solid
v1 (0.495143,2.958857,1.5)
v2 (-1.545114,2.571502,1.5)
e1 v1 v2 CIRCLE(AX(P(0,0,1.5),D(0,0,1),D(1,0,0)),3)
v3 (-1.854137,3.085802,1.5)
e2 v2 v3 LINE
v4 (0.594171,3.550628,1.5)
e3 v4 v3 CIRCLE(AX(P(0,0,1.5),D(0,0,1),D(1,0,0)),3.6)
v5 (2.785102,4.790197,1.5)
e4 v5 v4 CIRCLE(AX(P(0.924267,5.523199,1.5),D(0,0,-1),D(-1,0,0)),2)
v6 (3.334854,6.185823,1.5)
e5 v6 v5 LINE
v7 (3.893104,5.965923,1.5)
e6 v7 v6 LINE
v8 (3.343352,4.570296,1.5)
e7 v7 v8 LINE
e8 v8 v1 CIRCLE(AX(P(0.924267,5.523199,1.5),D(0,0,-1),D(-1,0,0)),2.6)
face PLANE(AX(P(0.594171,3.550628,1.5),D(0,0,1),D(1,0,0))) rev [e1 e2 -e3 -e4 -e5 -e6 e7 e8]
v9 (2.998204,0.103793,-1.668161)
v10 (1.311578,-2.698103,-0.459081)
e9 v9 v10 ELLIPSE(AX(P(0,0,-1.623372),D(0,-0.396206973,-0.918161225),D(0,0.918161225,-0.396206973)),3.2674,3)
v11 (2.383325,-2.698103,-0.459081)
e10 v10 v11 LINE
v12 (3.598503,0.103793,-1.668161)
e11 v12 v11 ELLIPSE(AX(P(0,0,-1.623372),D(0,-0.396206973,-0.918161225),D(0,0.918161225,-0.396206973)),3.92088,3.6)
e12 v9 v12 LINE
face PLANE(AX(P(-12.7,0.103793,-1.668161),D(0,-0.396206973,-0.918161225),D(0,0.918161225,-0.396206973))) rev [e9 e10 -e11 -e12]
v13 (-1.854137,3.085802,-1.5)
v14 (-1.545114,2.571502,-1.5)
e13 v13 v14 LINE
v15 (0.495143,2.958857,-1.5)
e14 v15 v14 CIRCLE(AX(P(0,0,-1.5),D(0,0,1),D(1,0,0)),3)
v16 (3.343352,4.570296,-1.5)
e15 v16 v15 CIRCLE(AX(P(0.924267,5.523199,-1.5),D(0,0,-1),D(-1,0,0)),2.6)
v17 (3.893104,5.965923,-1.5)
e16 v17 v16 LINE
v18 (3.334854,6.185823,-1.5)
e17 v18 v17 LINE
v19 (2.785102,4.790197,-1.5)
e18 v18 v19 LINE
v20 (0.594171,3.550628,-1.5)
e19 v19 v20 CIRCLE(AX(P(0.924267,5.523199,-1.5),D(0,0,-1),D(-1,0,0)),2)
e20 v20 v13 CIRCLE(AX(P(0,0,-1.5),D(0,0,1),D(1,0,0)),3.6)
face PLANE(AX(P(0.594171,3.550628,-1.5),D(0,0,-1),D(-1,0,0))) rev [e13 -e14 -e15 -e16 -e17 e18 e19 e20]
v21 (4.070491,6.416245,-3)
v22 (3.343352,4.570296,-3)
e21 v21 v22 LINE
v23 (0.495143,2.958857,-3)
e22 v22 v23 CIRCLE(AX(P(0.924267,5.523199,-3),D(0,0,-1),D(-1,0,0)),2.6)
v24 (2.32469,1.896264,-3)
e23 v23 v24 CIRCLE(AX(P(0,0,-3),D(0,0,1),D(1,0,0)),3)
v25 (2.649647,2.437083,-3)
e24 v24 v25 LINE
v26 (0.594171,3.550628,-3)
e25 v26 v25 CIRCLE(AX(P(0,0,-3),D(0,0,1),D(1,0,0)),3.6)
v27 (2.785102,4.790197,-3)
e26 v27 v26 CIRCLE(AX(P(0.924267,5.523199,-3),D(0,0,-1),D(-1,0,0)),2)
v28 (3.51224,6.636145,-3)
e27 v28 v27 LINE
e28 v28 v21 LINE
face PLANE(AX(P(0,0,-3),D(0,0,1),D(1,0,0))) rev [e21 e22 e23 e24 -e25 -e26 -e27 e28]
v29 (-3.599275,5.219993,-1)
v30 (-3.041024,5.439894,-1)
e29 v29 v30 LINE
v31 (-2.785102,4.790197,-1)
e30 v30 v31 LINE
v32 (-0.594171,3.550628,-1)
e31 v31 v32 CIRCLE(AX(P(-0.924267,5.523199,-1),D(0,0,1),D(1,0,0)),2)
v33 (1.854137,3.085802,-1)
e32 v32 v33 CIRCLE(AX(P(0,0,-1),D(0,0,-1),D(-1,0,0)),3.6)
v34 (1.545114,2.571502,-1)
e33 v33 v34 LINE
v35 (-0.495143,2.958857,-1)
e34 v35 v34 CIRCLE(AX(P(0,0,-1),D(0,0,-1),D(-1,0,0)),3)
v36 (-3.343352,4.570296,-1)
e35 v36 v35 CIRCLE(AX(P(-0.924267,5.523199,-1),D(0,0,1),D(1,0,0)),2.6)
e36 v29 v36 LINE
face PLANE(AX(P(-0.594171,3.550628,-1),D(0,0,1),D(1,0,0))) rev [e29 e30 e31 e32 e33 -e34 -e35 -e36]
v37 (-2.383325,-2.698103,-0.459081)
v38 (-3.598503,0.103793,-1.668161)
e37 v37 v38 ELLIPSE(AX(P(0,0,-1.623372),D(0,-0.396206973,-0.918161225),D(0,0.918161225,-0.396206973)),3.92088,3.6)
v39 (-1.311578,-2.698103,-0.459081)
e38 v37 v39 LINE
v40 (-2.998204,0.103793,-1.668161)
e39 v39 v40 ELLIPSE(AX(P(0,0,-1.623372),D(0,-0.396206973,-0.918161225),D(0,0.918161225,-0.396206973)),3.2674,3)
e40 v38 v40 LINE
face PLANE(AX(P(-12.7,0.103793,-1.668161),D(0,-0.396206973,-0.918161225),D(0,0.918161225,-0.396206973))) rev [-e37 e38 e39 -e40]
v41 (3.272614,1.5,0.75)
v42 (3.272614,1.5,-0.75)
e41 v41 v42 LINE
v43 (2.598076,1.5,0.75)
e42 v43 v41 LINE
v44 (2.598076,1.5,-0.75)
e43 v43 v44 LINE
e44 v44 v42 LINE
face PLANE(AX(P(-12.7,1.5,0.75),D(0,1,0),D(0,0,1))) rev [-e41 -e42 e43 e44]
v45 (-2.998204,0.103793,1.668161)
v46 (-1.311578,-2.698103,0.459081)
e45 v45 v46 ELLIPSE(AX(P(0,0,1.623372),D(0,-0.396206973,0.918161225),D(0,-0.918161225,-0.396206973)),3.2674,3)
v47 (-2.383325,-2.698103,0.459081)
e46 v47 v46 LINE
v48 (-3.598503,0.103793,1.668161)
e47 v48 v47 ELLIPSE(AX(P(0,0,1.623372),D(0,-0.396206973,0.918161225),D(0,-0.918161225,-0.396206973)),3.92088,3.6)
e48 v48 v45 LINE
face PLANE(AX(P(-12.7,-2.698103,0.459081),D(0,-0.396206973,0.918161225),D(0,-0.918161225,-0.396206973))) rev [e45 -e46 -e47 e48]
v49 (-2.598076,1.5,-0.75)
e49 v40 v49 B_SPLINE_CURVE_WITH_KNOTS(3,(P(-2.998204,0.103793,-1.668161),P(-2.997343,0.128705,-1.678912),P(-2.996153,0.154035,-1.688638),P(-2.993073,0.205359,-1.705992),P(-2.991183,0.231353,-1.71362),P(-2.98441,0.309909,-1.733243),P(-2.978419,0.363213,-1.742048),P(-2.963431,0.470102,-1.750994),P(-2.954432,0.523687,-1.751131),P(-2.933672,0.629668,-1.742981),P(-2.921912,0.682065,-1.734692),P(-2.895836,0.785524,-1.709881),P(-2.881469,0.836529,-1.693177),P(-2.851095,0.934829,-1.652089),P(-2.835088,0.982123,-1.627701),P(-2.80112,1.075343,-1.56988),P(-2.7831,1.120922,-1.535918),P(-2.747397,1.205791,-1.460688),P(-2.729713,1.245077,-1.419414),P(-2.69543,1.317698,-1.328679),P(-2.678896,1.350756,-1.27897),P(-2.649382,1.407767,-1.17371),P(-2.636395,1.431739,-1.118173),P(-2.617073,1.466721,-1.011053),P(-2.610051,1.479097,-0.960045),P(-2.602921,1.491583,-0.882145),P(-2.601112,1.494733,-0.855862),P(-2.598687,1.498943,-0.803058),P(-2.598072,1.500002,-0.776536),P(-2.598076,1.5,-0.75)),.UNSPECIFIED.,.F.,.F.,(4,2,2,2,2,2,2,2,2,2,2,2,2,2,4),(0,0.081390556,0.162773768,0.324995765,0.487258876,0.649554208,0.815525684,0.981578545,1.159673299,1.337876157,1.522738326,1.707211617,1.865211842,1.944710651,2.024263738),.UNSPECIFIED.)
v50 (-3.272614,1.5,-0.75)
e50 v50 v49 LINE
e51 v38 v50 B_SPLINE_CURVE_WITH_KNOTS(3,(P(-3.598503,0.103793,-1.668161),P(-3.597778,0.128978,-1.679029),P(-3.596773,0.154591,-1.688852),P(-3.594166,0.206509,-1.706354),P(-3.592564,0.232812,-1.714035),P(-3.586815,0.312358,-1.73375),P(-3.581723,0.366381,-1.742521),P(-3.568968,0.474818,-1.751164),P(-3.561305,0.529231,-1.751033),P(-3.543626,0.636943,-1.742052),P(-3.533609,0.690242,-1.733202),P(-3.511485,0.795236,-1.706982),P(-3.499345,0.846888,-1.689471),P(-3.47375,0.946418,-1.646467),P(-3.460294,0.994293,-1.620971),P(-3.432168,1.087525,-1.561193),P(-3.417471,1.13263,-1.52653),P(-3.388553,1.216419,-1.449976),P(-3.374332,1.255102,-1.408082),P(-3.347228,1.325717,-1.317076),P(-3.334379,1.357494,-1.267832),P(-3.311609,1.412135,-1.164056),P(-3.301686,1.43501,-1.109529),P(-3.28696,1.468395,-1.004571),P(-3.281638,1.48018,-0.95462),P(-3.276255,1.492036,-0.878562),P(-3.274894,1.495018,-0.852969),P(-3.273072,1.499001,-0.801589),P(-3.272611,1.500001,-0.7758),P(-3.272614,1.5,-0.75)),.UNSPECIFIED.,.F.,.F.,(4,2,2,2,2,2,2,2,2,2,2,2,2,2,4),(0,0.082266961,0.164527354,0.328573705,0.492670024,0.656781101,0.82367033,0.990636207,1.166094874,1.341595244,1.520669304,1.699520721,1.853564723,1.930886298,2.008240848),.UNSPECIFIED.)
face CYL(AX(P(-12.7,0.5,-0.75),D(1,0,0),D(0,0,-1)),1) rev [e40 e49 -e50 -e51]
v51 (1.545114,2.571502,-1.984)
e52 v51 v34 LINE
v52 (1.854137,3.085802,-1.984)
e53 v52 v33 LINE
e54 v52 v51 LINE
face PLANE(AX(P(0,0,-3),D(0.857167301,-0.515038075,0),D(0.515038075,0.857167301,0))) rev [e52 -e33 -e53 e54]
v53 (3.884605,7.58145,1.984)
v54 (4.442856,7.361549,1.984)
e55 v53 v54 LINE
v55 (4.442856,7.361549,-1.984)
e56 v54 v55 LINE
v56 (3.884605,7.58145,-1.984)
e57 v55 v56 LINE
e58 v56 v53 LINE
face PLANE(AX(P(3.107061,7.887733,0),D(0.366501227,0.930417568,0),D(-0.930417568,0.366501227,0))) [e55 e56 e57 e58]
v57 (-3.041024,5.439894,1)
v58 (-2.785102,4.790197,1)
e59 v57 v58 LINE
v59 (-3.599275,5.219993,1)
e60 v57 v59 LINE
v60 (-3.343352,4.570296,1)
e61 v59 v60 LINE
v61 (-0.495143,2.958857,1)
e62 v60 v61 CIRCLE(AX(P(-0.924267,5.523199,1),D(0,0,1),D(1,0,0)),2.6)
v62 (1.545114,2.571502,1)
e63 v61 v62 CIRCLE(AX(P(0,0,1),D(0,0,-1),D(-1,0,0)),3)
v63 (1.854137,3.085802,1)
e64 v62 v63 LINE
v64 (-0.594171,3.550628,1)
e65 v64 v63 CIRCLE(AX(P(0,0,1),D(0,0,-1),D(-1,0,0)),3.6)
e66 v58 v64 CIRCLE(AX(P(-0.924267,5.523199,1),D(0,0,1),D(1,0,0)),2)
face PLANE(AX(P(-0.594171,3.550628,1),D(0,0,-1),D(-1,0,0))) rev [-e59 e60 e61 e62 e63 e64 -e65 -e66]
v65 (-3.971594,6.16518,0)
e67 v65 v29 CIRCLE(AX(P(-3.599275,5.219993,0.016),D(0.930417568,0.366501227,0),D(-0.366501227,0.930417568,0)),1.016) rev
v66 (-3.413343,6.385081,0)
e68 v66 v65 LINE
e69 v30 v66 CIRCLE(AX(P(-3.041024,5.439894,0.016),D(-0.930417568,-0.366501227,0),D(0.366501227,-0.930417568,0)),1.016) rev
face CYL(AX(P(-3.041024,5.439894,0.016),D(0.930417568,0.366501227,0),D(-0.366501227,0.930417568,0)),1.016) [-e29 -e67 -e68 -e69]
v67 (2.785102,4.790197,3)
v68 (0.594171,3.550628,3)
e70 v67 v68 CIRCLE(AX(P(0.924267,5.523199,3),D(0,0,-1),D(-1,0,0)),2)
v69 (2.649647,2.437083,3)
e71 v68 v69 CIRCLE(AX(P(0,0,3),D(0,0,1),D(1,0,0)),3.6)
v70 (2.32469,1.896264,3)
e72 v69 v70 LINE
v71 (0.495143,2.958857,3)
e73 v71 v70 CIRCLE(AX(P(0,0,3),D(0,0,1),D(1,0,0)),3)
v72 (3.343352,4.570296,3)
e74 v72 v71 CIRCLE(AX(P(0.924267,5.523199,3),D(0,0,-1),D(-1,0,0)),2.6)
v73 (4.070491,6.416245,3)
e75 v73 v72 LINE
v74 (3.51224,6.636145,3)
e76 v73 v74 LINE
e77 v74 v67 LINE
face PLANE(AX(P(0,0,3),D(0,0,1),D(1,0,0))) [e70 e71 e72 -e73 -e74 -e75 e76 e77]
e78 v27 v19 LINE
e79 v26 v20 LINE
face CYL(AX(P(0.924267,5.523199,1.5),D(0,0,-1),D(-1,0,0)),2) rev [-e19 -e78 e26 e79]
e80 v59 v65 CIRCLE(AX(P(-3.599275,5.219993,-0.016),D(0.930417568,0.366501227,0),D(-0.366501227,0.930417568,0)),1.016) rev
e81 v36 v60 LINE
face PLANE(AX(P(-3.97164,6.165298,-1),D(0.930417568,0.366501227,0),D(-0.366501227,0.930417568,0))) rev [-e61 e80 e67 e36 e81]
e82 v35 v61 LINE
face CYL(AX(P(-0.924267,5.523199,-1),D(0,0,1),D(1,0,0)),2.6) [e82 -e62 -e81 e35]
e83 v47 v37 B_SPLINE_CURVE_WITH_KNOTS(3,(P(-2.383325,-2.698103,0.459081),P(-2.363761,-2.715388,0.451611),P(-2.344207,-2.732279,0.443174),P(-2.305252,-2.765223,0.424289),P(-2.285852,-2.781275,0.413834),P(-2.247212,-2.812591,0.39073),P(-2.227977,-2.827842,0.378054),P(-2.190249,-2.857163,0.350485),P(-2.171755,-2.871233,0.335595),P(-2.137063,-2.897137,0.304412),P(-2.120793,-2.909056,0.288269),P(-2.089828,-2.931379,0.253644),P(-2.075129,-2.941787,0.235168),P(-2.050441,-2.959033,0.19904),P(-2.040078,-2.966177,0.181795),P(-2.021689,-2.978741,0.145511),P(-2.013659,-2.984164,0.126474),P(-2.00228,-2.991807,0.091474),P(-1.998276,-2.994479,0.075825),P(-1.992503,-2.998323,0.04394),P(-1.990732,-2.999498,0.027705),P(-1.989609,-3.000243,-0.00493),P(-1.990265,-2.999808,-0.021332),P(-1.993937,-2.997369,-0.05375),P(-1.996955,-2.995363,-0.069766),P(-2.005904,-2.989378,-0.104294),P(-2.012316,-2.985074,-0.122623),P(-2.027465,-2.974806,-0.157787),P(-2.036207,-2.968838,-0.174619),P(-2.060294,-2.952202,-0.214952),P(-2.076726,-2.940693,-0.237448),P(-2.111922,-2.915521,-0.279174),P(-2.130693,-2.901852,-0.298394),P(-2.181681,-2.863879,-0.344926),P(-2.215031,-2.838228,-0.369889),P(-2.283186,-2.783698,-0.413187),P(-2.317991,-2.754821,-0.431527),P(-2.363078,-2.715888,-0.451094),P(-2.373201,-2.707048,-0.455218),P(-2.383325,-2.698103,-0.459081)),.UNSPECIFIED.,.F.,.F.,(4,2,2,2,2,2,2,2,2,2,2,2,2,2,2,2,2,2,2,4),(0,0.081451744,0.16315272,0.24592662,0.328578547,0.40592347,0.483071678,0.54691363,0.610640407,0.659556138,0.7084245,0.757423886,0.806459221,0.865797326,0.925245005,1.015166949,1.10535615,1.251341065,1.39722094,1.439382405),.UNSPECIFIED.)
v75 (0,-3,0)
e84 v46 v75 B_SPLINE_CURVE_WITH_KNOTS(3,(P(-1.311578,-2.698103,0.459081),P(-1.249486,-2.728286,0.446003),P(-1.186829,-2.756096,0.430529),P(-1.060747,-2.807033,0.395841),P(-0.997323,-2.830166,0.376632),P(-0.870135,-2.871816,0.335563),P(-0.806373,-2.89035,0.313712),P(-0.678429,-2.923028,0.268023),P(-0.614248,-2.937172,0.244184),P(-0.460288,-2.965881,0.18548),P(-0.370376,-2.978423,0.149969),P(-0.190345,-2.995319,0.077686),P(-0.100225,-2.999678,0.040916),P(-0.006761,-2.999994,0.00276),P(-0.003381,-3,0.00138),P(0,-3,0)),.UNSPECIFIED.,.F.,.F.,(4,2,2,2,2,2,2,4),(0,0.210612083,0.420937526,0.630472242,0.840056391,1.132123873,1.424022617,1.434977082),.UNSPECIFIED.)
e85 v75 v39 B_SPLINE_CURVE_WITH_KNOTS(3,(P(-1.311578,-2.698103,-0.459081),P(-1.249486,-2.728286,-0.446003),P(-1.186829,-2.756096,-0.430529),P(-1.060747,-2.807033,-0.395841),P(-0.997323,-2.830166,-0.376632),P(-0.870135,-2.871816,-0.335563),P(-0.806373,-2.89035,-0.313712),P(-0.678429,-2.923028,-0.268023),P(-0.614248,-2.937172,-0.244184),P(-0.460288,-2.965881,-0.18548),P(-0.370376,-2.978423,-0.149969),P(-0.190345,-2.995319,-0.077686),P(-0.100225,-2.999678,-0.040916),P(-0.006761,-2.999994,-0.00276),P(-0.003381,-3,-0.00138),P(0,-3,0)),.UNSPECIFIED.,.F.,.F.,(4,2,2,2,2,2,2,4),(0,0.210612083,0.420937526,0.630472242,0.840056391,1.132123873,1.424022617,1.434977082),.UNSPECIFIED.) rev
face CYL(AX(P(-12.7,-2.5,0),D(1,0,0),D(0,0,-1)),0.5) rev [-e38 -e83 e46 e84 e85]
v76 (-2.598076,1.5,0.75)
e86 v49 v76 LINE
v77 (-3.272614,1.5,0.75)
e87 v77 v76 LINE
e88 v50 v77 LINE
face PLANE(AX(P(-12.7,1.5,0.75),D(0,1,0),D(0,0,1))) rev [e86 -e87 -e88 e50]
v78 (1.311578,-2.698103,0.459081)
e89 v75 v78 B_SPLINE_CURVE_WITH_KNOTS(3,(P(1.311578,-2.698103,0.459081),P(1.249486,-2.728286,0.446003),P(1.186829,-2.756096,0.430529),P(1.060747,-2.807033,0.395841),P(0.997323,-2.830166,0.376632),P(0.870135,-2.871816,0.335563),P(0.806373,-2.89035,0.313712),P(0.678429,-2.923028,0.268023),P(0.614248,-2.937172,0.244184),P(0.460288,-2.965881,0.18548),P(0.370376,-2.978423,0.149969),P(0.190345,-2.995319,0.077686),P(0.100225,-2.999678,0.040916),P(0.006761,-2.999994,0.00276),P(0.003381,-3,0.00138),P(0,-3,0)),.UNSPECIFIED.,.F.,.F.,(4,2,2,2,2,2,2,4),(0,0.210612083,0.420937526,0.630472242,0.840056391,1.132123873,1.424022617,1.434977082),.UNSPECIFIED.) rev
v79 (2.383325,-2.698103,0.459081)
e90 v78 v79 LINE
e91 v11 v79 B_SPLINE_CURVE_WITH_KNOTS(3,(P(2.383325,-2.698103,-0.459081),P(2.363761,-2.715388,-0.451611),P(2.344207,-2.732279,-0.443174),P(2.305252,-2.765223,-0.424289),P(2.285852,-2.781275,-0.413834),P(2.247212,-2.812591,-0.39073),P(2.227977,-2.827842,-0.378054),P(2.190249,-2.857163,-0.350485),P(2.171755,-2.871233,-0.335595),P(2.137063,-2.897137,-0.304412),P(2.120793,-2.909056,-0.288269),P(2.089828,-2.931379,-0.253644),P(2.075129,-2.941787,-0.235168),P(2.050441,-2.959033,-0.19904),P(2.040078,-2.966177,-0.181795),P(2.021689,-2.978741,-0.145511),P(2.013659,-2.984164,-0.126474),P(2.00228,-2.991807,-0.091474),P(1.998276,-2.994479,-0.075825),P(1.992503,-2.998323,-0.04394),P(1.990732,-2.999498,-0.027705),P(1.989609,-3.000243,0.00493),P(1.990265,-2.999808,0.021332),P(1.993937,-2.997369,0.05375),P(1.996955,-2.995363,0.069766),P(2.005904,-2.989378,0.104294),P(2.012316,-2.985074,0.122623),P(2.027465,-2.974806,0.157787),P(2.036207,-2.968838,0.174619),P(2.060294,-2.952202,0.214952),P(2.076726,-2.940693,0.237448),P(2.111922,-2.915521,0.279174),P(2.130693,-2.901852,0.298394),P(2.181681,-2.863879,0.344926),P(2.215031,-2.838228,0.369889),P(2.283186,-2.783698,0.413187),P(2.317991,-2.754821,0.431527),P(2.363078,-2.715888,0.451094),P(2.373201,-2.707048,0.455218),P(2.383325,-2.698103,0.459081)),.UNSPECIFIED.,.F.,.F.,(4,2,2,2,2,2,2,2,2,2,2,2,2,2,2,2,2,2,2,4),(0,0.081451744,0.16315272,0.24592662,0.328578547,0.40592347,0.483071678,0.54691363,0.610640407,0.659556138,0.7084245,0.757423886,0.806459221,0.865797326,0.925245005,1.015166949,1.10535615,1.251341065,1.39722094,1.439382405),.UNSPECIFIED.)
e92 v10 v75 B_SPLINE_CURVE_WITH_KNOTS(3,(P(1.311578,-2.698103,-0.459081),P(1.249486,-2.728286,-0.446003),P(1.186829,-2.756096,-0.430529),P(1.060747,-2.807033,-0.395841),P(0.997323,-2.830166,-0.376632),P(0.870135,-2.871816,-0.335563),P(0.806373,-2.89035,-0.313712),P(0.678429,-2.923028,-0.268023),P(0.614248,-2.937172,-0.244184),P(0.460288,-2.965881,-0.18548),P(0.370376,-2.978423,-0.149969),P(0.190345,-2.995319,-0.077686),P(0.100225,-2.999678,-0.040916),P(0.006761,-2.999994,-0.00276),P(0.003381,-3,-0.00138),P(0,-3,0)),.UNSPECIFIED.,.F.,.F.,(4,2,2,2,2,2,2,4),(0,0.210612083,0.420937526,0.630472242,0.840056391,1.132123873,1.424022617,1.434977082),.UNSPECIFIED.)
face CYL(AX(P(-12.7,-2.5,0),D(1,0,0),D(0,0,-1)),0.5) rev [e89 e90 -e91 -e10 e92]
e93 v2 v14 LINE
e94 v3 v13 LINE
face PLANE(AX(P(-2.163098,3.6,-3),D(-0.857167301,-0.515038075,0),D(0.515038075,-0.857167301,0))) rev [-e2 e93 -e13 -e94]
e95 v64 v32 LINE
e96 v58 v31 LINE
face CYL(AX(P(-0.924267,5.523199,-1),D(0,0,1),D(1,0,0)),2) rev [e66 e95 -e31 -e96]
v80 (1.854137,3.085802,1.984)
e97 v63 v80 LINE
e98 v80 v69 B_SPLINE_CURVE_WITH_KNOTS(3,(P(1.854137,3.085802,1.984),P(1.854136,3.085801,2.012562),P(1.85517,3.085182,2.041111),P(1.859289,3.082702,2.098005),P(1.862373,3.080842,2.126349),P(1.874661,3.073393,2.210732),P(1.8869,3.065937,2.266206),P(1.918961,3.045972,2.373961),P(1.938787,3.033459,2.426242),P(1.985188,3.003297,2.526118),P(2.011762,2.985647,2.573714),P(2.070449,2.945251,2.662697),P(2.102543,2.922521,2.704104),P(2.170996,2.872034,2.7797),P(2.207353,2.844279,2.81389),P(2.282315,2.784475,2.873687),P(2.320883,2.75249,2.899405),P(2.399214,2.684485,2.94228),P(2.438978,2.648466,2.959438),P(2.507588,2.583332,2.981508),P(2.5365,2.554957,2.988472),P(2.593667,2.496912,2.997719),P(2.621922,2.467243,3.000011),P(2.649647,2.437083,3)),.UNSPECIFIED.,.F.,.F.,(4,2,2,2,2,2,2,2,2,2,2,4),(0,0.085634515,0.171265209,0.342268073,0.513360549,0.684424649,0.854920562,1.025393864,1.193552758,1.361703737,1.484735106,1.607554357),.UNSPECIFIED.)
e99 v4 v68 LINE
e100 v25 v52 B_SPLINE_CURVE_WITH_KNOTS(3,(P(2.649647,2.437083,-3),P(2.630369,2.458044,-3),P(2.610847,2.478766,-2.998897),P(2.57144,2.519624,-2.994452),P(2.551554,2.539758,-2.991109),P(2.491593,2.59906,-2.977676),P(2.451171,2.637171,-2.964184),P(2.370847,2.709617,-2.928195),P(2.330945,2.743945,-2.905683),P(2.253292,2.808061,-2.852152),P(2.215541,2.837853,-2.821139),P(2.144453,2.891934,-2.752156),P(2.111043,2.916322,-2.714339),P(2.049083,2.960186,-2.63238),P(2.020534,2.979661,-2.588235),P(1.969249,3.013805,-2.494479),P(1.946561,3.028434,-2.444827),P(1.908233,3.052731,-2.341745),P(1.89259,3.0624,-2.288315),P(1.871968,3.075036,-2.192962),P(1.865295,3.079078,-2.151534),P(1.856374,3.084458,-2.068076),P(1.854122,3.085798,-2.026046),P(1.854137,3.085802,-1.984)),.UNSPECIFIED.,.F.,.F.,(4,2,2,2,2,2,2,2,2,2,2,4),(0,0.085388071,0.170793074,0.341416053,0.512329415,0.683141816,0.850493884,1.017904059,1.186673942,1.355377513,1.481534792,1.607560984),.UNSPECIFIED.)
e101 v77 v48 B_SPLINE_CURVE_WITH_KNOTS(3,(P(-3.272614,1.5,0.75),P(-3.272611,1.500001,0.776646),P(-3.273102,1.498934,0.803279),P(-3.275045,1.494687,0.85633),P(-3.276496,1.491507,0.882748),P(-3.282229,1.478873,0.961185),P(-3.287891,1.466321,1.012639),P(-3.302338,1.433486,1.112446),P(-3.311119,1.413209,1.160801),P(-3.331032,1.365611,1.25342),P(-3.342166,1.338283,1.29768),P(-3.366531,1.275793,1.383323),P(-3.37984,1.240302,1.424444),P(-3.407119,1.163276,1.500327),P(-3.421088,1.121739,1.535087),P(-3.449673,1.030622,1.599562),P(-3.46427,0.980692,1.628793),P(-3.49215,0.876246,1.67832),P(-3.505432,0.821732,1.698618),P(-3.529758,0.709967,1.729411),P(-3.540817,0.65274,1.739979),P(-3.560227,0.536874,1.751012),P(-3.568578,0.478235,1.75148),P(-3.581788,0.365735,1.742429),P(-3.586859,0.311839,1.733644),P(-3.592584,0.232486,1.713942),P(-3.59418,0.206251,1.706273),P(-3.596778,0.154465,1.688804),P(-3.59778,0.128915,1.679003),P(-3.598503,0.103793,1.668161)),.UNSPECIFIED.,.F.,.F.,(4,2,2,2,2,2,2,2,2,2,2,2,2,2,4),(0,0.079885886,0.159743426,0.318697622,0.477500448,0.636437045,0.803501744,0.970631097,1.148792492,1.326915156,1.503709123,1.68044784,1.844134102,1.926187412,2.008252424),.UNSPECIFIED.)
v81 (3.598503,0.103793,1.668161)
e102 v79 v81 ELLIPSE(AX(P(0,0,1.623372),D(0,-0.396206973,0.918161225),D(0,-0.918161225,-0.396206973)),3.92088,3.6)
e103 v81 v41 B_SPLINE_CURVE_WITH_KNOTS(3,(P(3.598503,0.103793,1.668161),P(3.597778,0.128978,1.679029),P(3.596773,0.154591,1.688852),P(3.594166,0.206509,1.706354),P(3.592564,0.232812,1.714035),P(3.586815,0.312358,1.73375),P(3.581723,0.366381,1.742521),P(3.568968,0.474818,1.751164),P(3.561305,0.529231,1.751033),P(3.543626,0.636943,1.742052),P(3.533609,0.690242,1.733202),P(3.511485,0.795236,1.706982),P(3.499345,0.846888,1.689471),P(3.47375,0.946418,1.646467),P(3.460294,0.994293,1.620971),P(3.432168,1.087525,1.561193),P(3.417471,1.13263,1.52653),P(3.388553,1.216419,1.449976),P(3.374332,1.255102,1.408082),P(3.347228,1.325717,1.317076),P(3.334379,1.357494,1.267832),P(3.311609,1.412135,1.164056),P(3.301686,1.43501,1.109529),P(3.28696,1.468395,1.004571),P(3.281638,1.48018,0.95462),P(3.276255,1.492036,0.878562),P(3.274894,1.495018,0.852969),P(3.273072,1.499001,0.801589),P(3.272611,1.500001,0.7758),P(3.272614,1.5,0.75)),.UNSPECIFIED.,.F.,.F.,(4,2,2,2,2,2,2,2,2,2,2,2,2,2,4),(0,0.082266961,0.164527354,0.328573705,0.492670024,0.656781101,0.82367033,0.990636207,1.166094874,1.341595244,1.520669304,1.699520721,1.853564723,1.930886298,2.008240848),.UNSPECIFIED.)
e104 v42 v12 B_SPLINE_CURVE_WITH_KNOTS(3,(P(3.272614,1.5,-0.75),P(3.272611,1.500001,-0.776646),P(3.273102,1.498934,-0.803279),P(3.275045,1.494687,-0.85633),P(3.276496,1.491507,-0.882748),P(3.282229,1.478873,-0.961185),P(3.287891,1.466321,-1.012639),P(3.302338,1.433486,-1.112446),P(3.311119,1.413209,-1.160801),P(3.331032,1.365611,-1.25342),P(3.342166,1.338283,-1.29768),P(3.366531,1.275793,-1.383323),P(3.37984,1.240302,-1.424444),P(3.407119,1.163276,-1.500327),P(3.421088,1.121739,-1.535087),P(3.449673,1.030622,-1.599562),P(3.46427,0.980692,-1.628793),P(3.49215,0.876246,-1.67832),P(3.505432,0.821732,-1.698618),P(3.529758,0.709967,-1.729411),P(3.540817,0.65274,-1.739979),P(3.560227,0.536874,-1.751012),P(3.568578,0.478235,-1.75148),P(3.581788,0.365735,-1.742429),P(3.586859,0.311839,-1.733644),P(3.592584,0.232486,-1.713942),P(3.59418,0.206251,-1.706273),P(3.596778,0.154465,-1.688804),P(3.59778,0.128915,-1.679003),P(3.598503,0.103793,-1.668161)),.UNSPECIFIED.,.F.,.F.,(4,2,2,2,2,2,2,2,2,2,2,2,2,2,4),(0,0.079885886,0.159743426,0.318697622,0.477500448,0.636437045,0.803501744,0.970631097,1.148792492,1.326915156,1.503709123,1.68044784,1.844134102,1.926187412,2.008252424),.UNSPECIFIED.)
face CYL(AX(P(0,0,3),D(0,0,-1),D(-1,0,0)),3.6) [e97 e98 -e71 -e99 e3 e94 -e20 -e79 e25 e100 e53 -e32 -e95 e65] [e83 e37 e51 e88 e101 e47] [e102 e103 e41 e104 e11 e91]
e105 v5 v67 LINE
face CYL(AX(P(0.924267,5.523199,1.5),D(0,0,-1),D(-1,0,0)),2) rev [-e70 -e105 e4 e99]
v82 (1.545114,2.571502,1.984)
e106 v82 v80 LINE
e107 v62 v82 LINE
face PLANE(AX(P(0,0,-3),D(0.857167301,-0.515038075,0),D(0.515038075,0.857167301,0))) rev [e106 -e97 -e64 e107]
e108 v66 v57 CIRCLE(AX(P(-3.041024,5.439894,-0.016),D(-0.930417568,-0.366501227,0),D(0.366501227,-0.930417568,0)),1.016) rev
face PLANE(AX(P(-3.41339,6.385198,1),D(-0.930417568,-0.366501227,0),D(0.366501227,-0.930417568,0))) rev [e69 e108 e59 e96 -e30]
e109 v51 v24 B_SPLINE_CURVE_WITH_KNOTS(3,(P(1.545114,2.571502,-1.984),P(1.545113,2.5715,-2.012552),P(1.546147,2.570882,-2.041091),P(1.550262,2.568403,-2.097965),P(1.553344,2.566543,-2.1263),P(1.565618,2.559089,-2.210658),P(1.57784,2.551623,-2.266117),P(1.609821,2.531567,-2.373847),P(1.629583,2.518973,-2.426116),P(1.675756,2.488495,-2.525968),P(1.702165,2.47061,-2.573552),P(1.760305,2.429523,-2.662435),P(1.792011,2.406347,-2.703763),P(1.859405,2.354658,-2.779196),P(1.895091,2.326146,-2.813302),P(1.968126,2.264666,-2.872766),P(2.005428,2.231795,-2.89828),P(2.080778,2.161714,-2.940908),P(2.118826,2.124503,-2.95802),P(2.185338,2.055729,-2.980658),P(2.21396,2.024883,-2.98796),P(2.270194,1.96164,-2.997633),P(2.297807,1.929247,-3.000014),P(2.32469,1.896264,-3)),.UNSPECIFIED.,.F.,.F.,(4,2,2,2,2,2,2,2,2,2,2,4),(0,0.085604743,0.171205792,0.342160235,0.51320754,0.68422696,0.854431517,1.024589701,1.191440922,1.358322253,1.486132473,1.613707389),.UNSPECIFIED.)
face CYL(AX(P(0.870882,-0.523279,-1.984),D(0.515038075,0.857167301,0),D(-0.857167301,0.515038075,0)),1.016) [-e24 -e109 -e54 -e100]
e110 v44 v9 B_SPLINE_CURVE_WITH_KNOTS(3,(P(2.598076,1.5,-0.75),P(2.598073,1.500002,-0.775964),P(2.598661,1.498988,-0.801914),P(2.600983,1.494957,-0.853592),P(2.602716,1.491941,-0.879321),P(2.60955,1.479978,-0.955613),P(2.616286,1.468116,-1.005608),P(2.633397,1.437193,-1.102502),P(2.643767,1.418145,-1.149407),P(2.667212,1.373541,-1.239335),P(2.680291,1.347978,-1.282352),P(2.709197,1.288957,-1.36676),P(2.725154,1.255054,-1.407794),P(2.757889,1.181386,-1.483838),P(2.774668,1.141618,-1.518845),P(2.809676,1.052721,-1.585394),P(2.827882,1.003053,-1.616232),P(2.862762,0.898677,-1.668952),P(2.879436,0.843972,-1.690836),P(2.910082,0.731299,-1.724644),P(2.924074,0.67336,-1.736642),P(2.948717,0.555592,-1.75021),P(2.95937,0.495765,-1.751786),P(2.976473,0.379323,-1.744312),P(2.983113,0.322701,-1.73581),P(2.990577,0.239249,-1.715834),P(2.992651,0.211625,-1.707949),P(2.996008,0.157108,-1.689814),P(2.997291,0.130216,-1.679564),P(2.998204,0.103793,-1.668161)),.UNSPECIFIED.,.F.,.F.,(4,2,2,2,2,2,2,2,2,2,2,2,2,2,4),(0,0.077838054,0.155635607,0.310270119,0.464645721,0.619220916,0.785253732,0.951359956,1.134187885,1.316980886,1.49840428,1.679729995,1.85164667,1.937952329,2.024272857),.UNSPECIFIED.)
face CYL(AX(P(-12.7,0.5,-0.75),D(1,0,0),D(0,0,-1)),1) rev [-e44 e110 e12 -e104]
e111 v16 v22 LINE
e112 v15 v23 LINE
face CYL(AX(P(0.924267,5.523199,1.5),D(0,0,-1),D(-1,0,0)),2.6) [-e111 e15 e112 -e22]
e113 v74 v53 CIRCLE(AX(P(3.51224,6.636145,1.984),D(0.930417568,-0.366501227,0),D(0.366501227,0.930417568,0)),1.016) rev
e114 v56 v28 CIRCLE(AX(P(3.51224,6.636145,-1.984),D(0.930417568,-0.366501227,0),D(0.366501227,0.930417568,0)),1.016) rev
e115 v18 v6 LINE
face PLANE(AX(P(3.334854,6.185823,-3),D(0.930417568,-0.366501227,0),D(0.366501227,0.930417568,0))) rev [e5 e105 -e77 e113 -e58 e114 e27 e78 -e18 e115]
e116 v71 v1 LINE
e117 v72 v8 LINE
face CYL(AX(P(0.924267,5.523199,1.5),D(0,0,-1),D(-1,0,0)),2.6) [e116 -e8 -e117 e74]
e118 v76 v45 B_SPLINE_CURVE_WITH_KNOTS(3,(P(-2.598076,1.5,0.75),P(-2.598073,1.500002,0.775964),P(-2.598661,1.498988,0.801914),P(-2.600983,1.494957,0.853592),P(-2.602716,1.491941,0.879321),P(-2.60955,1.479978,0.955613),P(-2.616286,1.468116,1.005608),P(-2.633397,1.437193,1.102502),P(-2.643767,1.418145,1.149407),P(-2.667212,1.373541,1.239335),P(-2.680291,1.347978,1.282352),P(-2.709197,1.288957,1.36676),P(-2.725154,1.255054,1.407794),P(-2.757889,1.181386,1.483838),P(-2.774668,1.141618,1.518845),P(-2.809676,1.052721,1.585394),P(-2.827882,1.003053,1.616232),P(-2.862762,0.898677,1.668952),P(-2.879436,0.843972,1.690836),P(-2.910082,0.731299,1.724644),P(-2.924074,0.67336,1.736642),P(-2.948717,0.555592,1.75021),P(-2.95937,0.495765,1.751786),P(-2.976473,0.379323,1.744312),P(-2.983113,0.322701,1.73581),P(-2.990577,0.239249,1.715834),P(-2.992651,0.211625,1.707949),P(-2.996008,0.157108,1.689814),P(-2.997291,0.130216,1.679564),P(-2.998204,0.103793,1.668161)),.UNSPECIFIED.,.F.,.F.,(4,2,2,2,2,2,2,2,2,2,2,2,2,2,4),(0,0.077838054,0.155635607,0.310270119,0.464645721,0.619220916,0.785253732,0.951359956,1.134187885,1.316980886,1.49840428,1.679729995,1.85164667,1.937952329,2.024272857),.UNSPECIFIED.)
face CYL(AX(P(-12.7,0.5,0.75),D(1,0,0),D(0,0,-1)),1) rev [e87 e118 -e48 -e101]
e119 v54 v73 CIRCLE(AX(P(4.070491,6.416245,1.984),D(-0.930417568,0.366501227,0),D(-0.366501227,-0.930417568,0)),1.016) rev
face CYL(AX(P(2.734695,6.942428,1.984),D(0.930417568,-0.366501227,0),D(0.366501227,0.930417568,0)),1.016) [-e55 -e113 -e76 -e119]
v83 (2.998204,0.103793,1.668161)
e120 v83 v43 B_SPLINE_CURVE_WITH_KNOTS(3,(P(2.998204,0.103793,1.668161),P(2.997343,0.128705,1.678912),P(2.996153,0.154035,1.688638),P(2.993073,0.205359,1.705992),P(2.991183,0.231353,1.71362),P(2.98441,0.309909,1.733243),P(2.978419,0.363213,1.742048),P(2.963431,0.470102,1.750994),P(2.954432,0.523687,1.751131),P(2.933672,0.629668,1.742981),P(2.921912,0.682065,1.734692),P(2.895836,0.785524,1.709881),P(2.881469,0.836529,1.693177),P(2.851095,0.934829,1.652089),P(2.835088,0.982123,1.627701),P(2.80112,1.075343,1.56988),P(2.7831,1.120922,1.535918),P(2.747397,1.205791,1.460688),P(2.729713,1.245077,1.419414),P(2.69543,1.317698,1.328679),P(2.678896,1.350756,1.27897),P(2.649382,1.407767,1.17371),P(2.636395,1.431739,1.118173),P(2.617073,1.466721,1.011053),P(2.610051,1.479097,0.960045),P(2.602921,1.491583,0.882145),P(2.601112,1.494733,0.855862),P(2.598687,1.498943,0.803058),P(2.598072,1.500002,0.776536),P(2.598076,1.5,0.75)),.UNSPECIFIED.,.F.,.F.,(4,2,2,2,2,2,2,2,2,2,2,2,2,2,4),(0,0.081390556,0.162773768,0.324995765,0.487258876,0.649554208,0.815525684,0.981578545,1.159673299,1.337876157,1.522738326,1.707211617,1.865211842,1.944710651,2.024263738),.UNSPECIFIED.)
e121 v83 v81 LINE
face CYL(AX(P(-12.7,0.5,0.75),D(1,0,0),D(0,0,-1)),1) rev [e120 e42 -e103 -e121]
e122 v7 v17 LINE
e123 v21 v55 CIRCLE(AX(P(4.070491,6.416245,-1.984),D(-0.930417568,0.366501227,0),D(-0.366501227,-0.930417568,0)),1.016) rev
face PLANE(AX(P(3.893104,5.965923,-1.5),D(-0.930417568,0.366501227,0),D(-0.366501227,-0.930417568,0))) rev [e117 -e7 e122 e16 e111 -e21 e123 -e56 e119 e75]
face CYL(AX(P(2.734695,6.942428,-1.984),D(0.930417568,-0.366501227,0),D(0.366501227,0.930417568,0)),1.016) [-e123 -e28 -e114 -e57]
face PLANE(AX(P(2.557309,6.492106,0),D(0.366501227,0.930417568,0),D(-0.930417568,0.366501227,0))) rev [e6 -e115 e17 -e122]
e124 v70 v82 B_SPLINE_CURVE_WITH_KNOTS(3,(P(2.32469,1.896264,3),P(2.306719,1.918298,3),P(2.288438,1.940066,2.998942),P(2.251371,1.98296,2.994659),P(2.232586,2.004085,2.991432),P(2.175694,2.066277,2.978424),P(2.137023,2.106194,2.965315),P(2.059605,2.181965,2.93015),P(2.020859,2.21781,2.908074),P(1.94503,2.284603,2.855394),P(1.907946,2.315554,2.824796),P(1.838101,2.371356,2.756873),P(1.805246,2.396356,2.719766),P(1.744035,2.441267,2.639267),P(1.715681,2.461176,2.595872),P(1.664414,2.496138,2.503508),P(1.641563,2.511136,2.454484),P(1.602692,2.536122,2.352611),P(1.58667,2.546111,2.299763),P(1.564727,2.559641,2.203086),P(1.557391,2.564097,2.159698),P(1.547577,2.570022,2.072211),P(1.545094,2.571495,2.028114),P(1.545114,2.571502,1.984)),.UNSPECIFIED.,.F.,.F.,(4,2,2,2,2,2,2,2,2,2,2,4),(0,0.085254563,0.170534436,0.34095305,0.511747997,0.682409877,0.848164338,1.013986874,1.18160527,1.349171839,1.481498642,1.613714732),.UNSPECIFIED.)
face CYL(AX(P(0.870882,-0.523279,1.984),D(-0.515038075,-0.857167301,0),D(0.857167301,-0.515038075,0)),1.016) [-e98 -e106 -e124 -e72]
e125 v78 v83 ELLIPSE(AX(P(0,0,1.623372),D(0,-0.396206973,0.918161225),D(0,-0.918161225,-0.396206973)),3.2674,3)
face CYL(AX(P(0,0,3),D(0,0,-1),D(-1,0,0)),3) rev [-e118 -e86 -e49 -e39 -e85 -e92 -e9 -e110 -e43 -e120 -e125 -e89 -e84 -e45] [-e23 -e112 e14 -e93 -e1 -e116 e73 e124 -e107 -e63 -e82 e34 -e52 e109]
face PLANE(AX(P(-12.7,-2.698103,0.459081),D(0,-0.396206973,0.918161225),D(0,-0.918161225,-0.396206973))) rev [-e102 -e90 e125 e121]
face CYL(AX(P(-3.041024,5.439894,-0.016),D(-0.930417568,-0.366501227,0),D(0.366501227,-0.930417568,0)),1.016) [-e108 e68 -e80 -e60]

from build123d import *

# Parameters (mm, degrees)
CYLINDER_SKETCH_R               = 3.6
CYLINDER_SKETCH_R_2             = 3
CYLINDER_EXTRUDE_DEPTH          = 3
CUT_SIDE_SLOTS_DEPTH            = 12.7
CUT_SLOT_IN_TOP_DEPTH           = 8.868926397
FEMALE_BASE_SKETCH_W            = 1.5
FEMALE_BASE_SKETCH_H            = 0.6
FEMALE_BASE_ANGLE               = 40.5
FEMALE_TRANSITION_SKETCH_W      = 1.5
FEMALE_TRANSITION_SKETCH_H      = 0.6
FEMALE_TRANSITION_REVOLVE_ANGLE = 78
FEMALE_LEVER_SKETCH_W           = 0.6
FEMALE_LEVER_SKETCH_H           = 1.5
FEMALE_LEVER_EXTRUDE_DEPTH      = 1.5
FEMALE_TOP_SKETCH_W             = 0.6
FEMALE_TOP_SKETCH_H             = 6
FEMALE_TOP_EXTRUDE_DEPTH        = 1.5
MALE_BASE_SKETCH_W              = 2
MALE_BASE_SKETCH_H              = 0.6
MALE_BASE_ANGLE                 = 40.5
MALE_TRANSITION_SKETCH_W        = 2
MALE_TRANSITION_SKETCH_H        = 0.6
MALE_TRANSITION_REVOLVE_ANGLE   = 78
MALE_LEVER_SKETCH_W             = 0.6
MALE_LEVER_SKETCH_H             = 2
MALE_LEVER_EXTRUDE_DEPTH        = 1.714285714
FILLETS_R                       = 1.016


with BuildPart() as part:
    # Cylinder Sketch → Cylinder Extrude (new, symmetric)
    with BuildSketch(Plane.XY):
        Circle(CYLINDER_SKETCH_R)
        Circle(CYLINDER_SKETCH_R_2, mode=Mode.SUBTRACT)
    extrude(amount=CYLINDER_EXTRUDE_DEPTH, both=True)

    # Side Slot Sketch → Cut Side Slots (cut, symmetric)
    with BuildSketch(Plane(origin=(0, 0, 0), x_dir=(0, 0, -1), z_dir=(1, 0, 0))):
        with BuildLine():
            Line((-0.75, 1.5), (0.75, 1.5))
            ThreePointArc((0.75, 1.5), (1.585525874, 1.049451102), (1.668161225, 0.103793027))
            Line((1.668161225, 0.103793027), (0.459080612, -2.698103486))
            ThreePointArc((0.459080612, -2.698103486), (0, -3), (-0.459080612, -2.698103486))
            Line((-0.459080612, -2.698103486), (-1.668161225, 0.103793027))
            ThreePointArc((-1.668161225, 0.103793027), (-1.585525874, 1.049451102), (-0.75, 1.5))
        make_face()
    extrude(amount=CUT_SIDE_SLOTS_DEPTH, both=True, mode=Mode.SUBTRACT)

    # Top Slot Sketch → Cut Slot in Top (cut, through all)
    with BuildSketch(Plane.XY.offset(3)):
        Polygon((-2.163098228, 3.6), (0, 0), (2.163098228, 3.6), align=None)
    extrude(amount=-CUT_SLOT_IN_TOP_DEPTH, mode=Mode.SUBTRACT)

    # Female Base Sketch → Female Base (revolve)
    with BuildSketch(Plane(origin=(0, 0, 0), x_dir=(0, 0, -1), z_dir=(0.8571673007021136, 0.515038074910052, 0))):
        with Locations((-2.25, 3.3)):
            Rectangle(FEMALE_BASE_SKETCH_W, FEMALE_BASE_SKETCH_H)
        with Locations((2.25, 3.3)):
            Rectangle(FEMALE_BASE_SKETCH_W, FEMALE_BASE_SKETCH_H)
    revolve(axis=Axis((0, 0, 0), (0, 0, -1)), revolution_arc=FEMALE_BASE_ANGLE)

    # Female Transition Sketch → Female Transition Revolve (revolve)
    with BuildSketch(Plane(origin=(0, 0, 0), x_dir=(0, 0, -1), z_dir=(0.9862856015372308, -0.16504760586068196, 0))):
        with Locations((2.25, 3.3)):
            Rectangle(FEMALE_TRANSITION_SKETCH_W, FEMALE_TRANSITION_SKETCH_H)
        with Locations((-2.25, 3.3)):
            Rectangle(FEMALE_TRANSITION_SKETCH_W, FEMALE_TRANSITION_SKETCH_H)
    revolve(axis=Axis((0.924266593, 5.523199369, 1.5), (0, 0, 1)), revolution_arc=FEMALE_TRANSITION_REVOLVE_ANGLE)

    # Female Lever Sketch → Female Lever Extrude (add)
    with BuildSketch(Plane(origin=(2.007556855, 5.096479986, 0), x_dir=(0.9304175679820241, -0.3665012267242986, 0), z_dir=(0.3665012267242986, 0.9304175679820241, 0))):
        with Locations((1.135694531, 2.25)):
            Rectangle(FEMALE_LEVER_SKETCH_W, FEMALE_LEVER_SKETCH_H)
        with Locations((1.135694531, -2.25)):
            Rectangle(FEMALE_LEVER_SKETCH_W, FEMALE_LEVER_SKETCH_H)
    extrude(amount=FEMALE_LEVER_EXTRUDE_DEPTH)

    # Female Top Sketch → Female Top Extrude (add)
    with BuildSketch(Plane(origin=(2.557308695, 6.492106338, 0), x_dir=(0.930417567982024, -0.3665012267242986, 0), z_dir=(0.3665012267242986, 0.9304175679820241, 0))):
        with Locations((1.135694531, 0)):
            Rectangle(FEMALE_TOP_SKETCH_W, FEMALE_TOP_SKETCH_H)
    extrude(amount=FEMALE_TOP_EXTRUDE_DEPTH)

    # Male Base Sketch → Male Base (revolve)
    with BuildSketch(Plane(origin=(0, 0, 0), x_dir=(0, 0, 1), z_dir=(-0.8571673007021136, 0.515038074910052, 0))):
        with Locations((0, 3.3)):
            Rectangle(MALE_BASE_SKETCH_W, MALE_BASE_SKETCH_H)
    revolve(axis=Axis((0, 0, 0), (0, 0, 1)), revolution_arc=MALE_BASE_ANGLE)

    # Male Transition Sketch → Male Transition Revolve (revolve)
    with BuildSketch(Plane(origin=(0, 0, 0), x_dir=(0, 0, 1), z_dir=(-0.9862856015372308, -0.16504760586068182, 0))):
        with Locations((0, 3.3)):
            Rectangle(MALE_TRANSITION_SKETCH_W, MALE_TRANSITION_SKETCH_H)
    revolve(axis=Axis((-0.924266593, 5.523199369, -1), (0, 0, -1)), revolution_arc=MALE_TRANSITION_REVOLVE_ANGLE)

    # Male Lever Sketch → Male Lever Extrude (add)
    with BuildSketch(Plane(origin=(-2.007556855, 5.096479986, 0), x_dir=(0.9304175679820241, 0.3665012267242986, 0), z_dir=(-0.3665012267242986, 0.9304175679820241, 0))):
        with Locations((-1.135694531, 0)):
            Rectangle(MALE_LEVER_SKETCH_W, MALE_LEVER_SKETCH_H)
    extrude(amount=MALE_LEVER_EXTRUDE_DEPTH)

    # Fillets
    # the kernel refuses this fillet: 1.016 mm, written as the material it takes off along each edge
    with BuildSketch(Plane(origin=(0.236917514, 0.394296958, -3), x_dir=(0.8571673007021136, -0.5150380749100519, 0), z_dir=(0.515038074910052, 0.8571673007021137, 0))) as fillets_piece_1_section:
        with BuildLine():
            CenterArc((FILLETS_R, -FILLETS_R), FILLETS_R, 90, 90)
            Line((0, -FILLETS_R), (0, 0))
            Line((0, 0), (FILLETS_R, 0))
        make_face()
    fillets_piece_1 = extrude(amount=5.68, mode=Mode.PRIVATE)
    fillets_piece_1 = fillets_piece_1 & Plane(origin=(0, 0, -2.773460416), x_dir=(1, 0, 0), z_dir=(0, 0, 1)) * Cylinder(3.6, 16, mode=Mode.PRIVATE)
    add(fillets_piece_1, mode=Mode.SUBTRACT)
    with BuildSketch(Plane(origin=(0.236917514, 0.394296958, 3), x_dir=(0, 0, -1), z_dir=(0.515038074910052, 0.8571673007021137, 0))) as fillets_piece_2_section:
        with BuildLine():
            CenterArc((FILLETS_R, -FILLETS_R), FILLETS_R, 90, 90)
            Line((0, -FILLETS_R), (0, 0))
            Line((0, 0), (FILLETS_R, 0))
        make_face()
    fillets_piece_2 = extrude(amount=5.68, mode=Mode.PRIVATE)
    fillets_piece_2 = fillets_piece_2 & Plane(origin=(0, 0, 2.773461153), x_dir=(1, 0, 0), z_dir=(0, 0, 1)) * Cylinder(3.6, 16, mode=Mode.PRIVATE)
    add(fillets_piece_2, mode=Mode.SUBTRACT)
    with BuildSketch(Plane(origin=(-6.334900709, 5.234384608, 1), x_dir=(0.3665012267242986, -0.930417567982024, 0), z_dir=(0.9304175679820241, 0.3665012267242986, 0)), Plane(origin=(-1.050128923, 7.316111576, -1), x_dir=(0.3665012267242985, -0.930417567982024, 0), z_dir=(-0.9304175679820241, -0.3665012267242986, 0))) as fillets_piece_3:
        with BuildLine():
            CenterArc((FILLETS_R, FILLETS_R), FILLETS_R, 180, 90)
            Line((0, FILLETS_R), (0, 0))
            Line((0, 0), (FILLETS_R, 0))
        make_face()
    extrude(amount=5.68, mode=Mode.SUBTRACT)
    with BuildSketch(Plane(origin=(1.521344786, 8.512362735, -3), x_dir=(-0.3665012267242986, -0.930417567982024, 0), z_dir=(0.9304175679820241, -0.3665012267242986, 0)), Plane(origin=(6.806116572, 6.430635767, 3), x_dir=(-0.3665012267242985, -0.930417567982024, 0), z_dir=(-0.9304175679820241, 0.3665012267242986, 0))) as fillets_piece_4:
        with BuildLine():
            CenterArc((FILLETS_R, -FILLETS_R), FILLETS_R, 90, 90)
            Line((0, -FILLETS_R), (0, 0))
            Line((0, 0), (FILLETS_R, 0))
        make_face()
    extrude(amount=5.68, mode=Mode.SUBTRACT)


solid = part.part
